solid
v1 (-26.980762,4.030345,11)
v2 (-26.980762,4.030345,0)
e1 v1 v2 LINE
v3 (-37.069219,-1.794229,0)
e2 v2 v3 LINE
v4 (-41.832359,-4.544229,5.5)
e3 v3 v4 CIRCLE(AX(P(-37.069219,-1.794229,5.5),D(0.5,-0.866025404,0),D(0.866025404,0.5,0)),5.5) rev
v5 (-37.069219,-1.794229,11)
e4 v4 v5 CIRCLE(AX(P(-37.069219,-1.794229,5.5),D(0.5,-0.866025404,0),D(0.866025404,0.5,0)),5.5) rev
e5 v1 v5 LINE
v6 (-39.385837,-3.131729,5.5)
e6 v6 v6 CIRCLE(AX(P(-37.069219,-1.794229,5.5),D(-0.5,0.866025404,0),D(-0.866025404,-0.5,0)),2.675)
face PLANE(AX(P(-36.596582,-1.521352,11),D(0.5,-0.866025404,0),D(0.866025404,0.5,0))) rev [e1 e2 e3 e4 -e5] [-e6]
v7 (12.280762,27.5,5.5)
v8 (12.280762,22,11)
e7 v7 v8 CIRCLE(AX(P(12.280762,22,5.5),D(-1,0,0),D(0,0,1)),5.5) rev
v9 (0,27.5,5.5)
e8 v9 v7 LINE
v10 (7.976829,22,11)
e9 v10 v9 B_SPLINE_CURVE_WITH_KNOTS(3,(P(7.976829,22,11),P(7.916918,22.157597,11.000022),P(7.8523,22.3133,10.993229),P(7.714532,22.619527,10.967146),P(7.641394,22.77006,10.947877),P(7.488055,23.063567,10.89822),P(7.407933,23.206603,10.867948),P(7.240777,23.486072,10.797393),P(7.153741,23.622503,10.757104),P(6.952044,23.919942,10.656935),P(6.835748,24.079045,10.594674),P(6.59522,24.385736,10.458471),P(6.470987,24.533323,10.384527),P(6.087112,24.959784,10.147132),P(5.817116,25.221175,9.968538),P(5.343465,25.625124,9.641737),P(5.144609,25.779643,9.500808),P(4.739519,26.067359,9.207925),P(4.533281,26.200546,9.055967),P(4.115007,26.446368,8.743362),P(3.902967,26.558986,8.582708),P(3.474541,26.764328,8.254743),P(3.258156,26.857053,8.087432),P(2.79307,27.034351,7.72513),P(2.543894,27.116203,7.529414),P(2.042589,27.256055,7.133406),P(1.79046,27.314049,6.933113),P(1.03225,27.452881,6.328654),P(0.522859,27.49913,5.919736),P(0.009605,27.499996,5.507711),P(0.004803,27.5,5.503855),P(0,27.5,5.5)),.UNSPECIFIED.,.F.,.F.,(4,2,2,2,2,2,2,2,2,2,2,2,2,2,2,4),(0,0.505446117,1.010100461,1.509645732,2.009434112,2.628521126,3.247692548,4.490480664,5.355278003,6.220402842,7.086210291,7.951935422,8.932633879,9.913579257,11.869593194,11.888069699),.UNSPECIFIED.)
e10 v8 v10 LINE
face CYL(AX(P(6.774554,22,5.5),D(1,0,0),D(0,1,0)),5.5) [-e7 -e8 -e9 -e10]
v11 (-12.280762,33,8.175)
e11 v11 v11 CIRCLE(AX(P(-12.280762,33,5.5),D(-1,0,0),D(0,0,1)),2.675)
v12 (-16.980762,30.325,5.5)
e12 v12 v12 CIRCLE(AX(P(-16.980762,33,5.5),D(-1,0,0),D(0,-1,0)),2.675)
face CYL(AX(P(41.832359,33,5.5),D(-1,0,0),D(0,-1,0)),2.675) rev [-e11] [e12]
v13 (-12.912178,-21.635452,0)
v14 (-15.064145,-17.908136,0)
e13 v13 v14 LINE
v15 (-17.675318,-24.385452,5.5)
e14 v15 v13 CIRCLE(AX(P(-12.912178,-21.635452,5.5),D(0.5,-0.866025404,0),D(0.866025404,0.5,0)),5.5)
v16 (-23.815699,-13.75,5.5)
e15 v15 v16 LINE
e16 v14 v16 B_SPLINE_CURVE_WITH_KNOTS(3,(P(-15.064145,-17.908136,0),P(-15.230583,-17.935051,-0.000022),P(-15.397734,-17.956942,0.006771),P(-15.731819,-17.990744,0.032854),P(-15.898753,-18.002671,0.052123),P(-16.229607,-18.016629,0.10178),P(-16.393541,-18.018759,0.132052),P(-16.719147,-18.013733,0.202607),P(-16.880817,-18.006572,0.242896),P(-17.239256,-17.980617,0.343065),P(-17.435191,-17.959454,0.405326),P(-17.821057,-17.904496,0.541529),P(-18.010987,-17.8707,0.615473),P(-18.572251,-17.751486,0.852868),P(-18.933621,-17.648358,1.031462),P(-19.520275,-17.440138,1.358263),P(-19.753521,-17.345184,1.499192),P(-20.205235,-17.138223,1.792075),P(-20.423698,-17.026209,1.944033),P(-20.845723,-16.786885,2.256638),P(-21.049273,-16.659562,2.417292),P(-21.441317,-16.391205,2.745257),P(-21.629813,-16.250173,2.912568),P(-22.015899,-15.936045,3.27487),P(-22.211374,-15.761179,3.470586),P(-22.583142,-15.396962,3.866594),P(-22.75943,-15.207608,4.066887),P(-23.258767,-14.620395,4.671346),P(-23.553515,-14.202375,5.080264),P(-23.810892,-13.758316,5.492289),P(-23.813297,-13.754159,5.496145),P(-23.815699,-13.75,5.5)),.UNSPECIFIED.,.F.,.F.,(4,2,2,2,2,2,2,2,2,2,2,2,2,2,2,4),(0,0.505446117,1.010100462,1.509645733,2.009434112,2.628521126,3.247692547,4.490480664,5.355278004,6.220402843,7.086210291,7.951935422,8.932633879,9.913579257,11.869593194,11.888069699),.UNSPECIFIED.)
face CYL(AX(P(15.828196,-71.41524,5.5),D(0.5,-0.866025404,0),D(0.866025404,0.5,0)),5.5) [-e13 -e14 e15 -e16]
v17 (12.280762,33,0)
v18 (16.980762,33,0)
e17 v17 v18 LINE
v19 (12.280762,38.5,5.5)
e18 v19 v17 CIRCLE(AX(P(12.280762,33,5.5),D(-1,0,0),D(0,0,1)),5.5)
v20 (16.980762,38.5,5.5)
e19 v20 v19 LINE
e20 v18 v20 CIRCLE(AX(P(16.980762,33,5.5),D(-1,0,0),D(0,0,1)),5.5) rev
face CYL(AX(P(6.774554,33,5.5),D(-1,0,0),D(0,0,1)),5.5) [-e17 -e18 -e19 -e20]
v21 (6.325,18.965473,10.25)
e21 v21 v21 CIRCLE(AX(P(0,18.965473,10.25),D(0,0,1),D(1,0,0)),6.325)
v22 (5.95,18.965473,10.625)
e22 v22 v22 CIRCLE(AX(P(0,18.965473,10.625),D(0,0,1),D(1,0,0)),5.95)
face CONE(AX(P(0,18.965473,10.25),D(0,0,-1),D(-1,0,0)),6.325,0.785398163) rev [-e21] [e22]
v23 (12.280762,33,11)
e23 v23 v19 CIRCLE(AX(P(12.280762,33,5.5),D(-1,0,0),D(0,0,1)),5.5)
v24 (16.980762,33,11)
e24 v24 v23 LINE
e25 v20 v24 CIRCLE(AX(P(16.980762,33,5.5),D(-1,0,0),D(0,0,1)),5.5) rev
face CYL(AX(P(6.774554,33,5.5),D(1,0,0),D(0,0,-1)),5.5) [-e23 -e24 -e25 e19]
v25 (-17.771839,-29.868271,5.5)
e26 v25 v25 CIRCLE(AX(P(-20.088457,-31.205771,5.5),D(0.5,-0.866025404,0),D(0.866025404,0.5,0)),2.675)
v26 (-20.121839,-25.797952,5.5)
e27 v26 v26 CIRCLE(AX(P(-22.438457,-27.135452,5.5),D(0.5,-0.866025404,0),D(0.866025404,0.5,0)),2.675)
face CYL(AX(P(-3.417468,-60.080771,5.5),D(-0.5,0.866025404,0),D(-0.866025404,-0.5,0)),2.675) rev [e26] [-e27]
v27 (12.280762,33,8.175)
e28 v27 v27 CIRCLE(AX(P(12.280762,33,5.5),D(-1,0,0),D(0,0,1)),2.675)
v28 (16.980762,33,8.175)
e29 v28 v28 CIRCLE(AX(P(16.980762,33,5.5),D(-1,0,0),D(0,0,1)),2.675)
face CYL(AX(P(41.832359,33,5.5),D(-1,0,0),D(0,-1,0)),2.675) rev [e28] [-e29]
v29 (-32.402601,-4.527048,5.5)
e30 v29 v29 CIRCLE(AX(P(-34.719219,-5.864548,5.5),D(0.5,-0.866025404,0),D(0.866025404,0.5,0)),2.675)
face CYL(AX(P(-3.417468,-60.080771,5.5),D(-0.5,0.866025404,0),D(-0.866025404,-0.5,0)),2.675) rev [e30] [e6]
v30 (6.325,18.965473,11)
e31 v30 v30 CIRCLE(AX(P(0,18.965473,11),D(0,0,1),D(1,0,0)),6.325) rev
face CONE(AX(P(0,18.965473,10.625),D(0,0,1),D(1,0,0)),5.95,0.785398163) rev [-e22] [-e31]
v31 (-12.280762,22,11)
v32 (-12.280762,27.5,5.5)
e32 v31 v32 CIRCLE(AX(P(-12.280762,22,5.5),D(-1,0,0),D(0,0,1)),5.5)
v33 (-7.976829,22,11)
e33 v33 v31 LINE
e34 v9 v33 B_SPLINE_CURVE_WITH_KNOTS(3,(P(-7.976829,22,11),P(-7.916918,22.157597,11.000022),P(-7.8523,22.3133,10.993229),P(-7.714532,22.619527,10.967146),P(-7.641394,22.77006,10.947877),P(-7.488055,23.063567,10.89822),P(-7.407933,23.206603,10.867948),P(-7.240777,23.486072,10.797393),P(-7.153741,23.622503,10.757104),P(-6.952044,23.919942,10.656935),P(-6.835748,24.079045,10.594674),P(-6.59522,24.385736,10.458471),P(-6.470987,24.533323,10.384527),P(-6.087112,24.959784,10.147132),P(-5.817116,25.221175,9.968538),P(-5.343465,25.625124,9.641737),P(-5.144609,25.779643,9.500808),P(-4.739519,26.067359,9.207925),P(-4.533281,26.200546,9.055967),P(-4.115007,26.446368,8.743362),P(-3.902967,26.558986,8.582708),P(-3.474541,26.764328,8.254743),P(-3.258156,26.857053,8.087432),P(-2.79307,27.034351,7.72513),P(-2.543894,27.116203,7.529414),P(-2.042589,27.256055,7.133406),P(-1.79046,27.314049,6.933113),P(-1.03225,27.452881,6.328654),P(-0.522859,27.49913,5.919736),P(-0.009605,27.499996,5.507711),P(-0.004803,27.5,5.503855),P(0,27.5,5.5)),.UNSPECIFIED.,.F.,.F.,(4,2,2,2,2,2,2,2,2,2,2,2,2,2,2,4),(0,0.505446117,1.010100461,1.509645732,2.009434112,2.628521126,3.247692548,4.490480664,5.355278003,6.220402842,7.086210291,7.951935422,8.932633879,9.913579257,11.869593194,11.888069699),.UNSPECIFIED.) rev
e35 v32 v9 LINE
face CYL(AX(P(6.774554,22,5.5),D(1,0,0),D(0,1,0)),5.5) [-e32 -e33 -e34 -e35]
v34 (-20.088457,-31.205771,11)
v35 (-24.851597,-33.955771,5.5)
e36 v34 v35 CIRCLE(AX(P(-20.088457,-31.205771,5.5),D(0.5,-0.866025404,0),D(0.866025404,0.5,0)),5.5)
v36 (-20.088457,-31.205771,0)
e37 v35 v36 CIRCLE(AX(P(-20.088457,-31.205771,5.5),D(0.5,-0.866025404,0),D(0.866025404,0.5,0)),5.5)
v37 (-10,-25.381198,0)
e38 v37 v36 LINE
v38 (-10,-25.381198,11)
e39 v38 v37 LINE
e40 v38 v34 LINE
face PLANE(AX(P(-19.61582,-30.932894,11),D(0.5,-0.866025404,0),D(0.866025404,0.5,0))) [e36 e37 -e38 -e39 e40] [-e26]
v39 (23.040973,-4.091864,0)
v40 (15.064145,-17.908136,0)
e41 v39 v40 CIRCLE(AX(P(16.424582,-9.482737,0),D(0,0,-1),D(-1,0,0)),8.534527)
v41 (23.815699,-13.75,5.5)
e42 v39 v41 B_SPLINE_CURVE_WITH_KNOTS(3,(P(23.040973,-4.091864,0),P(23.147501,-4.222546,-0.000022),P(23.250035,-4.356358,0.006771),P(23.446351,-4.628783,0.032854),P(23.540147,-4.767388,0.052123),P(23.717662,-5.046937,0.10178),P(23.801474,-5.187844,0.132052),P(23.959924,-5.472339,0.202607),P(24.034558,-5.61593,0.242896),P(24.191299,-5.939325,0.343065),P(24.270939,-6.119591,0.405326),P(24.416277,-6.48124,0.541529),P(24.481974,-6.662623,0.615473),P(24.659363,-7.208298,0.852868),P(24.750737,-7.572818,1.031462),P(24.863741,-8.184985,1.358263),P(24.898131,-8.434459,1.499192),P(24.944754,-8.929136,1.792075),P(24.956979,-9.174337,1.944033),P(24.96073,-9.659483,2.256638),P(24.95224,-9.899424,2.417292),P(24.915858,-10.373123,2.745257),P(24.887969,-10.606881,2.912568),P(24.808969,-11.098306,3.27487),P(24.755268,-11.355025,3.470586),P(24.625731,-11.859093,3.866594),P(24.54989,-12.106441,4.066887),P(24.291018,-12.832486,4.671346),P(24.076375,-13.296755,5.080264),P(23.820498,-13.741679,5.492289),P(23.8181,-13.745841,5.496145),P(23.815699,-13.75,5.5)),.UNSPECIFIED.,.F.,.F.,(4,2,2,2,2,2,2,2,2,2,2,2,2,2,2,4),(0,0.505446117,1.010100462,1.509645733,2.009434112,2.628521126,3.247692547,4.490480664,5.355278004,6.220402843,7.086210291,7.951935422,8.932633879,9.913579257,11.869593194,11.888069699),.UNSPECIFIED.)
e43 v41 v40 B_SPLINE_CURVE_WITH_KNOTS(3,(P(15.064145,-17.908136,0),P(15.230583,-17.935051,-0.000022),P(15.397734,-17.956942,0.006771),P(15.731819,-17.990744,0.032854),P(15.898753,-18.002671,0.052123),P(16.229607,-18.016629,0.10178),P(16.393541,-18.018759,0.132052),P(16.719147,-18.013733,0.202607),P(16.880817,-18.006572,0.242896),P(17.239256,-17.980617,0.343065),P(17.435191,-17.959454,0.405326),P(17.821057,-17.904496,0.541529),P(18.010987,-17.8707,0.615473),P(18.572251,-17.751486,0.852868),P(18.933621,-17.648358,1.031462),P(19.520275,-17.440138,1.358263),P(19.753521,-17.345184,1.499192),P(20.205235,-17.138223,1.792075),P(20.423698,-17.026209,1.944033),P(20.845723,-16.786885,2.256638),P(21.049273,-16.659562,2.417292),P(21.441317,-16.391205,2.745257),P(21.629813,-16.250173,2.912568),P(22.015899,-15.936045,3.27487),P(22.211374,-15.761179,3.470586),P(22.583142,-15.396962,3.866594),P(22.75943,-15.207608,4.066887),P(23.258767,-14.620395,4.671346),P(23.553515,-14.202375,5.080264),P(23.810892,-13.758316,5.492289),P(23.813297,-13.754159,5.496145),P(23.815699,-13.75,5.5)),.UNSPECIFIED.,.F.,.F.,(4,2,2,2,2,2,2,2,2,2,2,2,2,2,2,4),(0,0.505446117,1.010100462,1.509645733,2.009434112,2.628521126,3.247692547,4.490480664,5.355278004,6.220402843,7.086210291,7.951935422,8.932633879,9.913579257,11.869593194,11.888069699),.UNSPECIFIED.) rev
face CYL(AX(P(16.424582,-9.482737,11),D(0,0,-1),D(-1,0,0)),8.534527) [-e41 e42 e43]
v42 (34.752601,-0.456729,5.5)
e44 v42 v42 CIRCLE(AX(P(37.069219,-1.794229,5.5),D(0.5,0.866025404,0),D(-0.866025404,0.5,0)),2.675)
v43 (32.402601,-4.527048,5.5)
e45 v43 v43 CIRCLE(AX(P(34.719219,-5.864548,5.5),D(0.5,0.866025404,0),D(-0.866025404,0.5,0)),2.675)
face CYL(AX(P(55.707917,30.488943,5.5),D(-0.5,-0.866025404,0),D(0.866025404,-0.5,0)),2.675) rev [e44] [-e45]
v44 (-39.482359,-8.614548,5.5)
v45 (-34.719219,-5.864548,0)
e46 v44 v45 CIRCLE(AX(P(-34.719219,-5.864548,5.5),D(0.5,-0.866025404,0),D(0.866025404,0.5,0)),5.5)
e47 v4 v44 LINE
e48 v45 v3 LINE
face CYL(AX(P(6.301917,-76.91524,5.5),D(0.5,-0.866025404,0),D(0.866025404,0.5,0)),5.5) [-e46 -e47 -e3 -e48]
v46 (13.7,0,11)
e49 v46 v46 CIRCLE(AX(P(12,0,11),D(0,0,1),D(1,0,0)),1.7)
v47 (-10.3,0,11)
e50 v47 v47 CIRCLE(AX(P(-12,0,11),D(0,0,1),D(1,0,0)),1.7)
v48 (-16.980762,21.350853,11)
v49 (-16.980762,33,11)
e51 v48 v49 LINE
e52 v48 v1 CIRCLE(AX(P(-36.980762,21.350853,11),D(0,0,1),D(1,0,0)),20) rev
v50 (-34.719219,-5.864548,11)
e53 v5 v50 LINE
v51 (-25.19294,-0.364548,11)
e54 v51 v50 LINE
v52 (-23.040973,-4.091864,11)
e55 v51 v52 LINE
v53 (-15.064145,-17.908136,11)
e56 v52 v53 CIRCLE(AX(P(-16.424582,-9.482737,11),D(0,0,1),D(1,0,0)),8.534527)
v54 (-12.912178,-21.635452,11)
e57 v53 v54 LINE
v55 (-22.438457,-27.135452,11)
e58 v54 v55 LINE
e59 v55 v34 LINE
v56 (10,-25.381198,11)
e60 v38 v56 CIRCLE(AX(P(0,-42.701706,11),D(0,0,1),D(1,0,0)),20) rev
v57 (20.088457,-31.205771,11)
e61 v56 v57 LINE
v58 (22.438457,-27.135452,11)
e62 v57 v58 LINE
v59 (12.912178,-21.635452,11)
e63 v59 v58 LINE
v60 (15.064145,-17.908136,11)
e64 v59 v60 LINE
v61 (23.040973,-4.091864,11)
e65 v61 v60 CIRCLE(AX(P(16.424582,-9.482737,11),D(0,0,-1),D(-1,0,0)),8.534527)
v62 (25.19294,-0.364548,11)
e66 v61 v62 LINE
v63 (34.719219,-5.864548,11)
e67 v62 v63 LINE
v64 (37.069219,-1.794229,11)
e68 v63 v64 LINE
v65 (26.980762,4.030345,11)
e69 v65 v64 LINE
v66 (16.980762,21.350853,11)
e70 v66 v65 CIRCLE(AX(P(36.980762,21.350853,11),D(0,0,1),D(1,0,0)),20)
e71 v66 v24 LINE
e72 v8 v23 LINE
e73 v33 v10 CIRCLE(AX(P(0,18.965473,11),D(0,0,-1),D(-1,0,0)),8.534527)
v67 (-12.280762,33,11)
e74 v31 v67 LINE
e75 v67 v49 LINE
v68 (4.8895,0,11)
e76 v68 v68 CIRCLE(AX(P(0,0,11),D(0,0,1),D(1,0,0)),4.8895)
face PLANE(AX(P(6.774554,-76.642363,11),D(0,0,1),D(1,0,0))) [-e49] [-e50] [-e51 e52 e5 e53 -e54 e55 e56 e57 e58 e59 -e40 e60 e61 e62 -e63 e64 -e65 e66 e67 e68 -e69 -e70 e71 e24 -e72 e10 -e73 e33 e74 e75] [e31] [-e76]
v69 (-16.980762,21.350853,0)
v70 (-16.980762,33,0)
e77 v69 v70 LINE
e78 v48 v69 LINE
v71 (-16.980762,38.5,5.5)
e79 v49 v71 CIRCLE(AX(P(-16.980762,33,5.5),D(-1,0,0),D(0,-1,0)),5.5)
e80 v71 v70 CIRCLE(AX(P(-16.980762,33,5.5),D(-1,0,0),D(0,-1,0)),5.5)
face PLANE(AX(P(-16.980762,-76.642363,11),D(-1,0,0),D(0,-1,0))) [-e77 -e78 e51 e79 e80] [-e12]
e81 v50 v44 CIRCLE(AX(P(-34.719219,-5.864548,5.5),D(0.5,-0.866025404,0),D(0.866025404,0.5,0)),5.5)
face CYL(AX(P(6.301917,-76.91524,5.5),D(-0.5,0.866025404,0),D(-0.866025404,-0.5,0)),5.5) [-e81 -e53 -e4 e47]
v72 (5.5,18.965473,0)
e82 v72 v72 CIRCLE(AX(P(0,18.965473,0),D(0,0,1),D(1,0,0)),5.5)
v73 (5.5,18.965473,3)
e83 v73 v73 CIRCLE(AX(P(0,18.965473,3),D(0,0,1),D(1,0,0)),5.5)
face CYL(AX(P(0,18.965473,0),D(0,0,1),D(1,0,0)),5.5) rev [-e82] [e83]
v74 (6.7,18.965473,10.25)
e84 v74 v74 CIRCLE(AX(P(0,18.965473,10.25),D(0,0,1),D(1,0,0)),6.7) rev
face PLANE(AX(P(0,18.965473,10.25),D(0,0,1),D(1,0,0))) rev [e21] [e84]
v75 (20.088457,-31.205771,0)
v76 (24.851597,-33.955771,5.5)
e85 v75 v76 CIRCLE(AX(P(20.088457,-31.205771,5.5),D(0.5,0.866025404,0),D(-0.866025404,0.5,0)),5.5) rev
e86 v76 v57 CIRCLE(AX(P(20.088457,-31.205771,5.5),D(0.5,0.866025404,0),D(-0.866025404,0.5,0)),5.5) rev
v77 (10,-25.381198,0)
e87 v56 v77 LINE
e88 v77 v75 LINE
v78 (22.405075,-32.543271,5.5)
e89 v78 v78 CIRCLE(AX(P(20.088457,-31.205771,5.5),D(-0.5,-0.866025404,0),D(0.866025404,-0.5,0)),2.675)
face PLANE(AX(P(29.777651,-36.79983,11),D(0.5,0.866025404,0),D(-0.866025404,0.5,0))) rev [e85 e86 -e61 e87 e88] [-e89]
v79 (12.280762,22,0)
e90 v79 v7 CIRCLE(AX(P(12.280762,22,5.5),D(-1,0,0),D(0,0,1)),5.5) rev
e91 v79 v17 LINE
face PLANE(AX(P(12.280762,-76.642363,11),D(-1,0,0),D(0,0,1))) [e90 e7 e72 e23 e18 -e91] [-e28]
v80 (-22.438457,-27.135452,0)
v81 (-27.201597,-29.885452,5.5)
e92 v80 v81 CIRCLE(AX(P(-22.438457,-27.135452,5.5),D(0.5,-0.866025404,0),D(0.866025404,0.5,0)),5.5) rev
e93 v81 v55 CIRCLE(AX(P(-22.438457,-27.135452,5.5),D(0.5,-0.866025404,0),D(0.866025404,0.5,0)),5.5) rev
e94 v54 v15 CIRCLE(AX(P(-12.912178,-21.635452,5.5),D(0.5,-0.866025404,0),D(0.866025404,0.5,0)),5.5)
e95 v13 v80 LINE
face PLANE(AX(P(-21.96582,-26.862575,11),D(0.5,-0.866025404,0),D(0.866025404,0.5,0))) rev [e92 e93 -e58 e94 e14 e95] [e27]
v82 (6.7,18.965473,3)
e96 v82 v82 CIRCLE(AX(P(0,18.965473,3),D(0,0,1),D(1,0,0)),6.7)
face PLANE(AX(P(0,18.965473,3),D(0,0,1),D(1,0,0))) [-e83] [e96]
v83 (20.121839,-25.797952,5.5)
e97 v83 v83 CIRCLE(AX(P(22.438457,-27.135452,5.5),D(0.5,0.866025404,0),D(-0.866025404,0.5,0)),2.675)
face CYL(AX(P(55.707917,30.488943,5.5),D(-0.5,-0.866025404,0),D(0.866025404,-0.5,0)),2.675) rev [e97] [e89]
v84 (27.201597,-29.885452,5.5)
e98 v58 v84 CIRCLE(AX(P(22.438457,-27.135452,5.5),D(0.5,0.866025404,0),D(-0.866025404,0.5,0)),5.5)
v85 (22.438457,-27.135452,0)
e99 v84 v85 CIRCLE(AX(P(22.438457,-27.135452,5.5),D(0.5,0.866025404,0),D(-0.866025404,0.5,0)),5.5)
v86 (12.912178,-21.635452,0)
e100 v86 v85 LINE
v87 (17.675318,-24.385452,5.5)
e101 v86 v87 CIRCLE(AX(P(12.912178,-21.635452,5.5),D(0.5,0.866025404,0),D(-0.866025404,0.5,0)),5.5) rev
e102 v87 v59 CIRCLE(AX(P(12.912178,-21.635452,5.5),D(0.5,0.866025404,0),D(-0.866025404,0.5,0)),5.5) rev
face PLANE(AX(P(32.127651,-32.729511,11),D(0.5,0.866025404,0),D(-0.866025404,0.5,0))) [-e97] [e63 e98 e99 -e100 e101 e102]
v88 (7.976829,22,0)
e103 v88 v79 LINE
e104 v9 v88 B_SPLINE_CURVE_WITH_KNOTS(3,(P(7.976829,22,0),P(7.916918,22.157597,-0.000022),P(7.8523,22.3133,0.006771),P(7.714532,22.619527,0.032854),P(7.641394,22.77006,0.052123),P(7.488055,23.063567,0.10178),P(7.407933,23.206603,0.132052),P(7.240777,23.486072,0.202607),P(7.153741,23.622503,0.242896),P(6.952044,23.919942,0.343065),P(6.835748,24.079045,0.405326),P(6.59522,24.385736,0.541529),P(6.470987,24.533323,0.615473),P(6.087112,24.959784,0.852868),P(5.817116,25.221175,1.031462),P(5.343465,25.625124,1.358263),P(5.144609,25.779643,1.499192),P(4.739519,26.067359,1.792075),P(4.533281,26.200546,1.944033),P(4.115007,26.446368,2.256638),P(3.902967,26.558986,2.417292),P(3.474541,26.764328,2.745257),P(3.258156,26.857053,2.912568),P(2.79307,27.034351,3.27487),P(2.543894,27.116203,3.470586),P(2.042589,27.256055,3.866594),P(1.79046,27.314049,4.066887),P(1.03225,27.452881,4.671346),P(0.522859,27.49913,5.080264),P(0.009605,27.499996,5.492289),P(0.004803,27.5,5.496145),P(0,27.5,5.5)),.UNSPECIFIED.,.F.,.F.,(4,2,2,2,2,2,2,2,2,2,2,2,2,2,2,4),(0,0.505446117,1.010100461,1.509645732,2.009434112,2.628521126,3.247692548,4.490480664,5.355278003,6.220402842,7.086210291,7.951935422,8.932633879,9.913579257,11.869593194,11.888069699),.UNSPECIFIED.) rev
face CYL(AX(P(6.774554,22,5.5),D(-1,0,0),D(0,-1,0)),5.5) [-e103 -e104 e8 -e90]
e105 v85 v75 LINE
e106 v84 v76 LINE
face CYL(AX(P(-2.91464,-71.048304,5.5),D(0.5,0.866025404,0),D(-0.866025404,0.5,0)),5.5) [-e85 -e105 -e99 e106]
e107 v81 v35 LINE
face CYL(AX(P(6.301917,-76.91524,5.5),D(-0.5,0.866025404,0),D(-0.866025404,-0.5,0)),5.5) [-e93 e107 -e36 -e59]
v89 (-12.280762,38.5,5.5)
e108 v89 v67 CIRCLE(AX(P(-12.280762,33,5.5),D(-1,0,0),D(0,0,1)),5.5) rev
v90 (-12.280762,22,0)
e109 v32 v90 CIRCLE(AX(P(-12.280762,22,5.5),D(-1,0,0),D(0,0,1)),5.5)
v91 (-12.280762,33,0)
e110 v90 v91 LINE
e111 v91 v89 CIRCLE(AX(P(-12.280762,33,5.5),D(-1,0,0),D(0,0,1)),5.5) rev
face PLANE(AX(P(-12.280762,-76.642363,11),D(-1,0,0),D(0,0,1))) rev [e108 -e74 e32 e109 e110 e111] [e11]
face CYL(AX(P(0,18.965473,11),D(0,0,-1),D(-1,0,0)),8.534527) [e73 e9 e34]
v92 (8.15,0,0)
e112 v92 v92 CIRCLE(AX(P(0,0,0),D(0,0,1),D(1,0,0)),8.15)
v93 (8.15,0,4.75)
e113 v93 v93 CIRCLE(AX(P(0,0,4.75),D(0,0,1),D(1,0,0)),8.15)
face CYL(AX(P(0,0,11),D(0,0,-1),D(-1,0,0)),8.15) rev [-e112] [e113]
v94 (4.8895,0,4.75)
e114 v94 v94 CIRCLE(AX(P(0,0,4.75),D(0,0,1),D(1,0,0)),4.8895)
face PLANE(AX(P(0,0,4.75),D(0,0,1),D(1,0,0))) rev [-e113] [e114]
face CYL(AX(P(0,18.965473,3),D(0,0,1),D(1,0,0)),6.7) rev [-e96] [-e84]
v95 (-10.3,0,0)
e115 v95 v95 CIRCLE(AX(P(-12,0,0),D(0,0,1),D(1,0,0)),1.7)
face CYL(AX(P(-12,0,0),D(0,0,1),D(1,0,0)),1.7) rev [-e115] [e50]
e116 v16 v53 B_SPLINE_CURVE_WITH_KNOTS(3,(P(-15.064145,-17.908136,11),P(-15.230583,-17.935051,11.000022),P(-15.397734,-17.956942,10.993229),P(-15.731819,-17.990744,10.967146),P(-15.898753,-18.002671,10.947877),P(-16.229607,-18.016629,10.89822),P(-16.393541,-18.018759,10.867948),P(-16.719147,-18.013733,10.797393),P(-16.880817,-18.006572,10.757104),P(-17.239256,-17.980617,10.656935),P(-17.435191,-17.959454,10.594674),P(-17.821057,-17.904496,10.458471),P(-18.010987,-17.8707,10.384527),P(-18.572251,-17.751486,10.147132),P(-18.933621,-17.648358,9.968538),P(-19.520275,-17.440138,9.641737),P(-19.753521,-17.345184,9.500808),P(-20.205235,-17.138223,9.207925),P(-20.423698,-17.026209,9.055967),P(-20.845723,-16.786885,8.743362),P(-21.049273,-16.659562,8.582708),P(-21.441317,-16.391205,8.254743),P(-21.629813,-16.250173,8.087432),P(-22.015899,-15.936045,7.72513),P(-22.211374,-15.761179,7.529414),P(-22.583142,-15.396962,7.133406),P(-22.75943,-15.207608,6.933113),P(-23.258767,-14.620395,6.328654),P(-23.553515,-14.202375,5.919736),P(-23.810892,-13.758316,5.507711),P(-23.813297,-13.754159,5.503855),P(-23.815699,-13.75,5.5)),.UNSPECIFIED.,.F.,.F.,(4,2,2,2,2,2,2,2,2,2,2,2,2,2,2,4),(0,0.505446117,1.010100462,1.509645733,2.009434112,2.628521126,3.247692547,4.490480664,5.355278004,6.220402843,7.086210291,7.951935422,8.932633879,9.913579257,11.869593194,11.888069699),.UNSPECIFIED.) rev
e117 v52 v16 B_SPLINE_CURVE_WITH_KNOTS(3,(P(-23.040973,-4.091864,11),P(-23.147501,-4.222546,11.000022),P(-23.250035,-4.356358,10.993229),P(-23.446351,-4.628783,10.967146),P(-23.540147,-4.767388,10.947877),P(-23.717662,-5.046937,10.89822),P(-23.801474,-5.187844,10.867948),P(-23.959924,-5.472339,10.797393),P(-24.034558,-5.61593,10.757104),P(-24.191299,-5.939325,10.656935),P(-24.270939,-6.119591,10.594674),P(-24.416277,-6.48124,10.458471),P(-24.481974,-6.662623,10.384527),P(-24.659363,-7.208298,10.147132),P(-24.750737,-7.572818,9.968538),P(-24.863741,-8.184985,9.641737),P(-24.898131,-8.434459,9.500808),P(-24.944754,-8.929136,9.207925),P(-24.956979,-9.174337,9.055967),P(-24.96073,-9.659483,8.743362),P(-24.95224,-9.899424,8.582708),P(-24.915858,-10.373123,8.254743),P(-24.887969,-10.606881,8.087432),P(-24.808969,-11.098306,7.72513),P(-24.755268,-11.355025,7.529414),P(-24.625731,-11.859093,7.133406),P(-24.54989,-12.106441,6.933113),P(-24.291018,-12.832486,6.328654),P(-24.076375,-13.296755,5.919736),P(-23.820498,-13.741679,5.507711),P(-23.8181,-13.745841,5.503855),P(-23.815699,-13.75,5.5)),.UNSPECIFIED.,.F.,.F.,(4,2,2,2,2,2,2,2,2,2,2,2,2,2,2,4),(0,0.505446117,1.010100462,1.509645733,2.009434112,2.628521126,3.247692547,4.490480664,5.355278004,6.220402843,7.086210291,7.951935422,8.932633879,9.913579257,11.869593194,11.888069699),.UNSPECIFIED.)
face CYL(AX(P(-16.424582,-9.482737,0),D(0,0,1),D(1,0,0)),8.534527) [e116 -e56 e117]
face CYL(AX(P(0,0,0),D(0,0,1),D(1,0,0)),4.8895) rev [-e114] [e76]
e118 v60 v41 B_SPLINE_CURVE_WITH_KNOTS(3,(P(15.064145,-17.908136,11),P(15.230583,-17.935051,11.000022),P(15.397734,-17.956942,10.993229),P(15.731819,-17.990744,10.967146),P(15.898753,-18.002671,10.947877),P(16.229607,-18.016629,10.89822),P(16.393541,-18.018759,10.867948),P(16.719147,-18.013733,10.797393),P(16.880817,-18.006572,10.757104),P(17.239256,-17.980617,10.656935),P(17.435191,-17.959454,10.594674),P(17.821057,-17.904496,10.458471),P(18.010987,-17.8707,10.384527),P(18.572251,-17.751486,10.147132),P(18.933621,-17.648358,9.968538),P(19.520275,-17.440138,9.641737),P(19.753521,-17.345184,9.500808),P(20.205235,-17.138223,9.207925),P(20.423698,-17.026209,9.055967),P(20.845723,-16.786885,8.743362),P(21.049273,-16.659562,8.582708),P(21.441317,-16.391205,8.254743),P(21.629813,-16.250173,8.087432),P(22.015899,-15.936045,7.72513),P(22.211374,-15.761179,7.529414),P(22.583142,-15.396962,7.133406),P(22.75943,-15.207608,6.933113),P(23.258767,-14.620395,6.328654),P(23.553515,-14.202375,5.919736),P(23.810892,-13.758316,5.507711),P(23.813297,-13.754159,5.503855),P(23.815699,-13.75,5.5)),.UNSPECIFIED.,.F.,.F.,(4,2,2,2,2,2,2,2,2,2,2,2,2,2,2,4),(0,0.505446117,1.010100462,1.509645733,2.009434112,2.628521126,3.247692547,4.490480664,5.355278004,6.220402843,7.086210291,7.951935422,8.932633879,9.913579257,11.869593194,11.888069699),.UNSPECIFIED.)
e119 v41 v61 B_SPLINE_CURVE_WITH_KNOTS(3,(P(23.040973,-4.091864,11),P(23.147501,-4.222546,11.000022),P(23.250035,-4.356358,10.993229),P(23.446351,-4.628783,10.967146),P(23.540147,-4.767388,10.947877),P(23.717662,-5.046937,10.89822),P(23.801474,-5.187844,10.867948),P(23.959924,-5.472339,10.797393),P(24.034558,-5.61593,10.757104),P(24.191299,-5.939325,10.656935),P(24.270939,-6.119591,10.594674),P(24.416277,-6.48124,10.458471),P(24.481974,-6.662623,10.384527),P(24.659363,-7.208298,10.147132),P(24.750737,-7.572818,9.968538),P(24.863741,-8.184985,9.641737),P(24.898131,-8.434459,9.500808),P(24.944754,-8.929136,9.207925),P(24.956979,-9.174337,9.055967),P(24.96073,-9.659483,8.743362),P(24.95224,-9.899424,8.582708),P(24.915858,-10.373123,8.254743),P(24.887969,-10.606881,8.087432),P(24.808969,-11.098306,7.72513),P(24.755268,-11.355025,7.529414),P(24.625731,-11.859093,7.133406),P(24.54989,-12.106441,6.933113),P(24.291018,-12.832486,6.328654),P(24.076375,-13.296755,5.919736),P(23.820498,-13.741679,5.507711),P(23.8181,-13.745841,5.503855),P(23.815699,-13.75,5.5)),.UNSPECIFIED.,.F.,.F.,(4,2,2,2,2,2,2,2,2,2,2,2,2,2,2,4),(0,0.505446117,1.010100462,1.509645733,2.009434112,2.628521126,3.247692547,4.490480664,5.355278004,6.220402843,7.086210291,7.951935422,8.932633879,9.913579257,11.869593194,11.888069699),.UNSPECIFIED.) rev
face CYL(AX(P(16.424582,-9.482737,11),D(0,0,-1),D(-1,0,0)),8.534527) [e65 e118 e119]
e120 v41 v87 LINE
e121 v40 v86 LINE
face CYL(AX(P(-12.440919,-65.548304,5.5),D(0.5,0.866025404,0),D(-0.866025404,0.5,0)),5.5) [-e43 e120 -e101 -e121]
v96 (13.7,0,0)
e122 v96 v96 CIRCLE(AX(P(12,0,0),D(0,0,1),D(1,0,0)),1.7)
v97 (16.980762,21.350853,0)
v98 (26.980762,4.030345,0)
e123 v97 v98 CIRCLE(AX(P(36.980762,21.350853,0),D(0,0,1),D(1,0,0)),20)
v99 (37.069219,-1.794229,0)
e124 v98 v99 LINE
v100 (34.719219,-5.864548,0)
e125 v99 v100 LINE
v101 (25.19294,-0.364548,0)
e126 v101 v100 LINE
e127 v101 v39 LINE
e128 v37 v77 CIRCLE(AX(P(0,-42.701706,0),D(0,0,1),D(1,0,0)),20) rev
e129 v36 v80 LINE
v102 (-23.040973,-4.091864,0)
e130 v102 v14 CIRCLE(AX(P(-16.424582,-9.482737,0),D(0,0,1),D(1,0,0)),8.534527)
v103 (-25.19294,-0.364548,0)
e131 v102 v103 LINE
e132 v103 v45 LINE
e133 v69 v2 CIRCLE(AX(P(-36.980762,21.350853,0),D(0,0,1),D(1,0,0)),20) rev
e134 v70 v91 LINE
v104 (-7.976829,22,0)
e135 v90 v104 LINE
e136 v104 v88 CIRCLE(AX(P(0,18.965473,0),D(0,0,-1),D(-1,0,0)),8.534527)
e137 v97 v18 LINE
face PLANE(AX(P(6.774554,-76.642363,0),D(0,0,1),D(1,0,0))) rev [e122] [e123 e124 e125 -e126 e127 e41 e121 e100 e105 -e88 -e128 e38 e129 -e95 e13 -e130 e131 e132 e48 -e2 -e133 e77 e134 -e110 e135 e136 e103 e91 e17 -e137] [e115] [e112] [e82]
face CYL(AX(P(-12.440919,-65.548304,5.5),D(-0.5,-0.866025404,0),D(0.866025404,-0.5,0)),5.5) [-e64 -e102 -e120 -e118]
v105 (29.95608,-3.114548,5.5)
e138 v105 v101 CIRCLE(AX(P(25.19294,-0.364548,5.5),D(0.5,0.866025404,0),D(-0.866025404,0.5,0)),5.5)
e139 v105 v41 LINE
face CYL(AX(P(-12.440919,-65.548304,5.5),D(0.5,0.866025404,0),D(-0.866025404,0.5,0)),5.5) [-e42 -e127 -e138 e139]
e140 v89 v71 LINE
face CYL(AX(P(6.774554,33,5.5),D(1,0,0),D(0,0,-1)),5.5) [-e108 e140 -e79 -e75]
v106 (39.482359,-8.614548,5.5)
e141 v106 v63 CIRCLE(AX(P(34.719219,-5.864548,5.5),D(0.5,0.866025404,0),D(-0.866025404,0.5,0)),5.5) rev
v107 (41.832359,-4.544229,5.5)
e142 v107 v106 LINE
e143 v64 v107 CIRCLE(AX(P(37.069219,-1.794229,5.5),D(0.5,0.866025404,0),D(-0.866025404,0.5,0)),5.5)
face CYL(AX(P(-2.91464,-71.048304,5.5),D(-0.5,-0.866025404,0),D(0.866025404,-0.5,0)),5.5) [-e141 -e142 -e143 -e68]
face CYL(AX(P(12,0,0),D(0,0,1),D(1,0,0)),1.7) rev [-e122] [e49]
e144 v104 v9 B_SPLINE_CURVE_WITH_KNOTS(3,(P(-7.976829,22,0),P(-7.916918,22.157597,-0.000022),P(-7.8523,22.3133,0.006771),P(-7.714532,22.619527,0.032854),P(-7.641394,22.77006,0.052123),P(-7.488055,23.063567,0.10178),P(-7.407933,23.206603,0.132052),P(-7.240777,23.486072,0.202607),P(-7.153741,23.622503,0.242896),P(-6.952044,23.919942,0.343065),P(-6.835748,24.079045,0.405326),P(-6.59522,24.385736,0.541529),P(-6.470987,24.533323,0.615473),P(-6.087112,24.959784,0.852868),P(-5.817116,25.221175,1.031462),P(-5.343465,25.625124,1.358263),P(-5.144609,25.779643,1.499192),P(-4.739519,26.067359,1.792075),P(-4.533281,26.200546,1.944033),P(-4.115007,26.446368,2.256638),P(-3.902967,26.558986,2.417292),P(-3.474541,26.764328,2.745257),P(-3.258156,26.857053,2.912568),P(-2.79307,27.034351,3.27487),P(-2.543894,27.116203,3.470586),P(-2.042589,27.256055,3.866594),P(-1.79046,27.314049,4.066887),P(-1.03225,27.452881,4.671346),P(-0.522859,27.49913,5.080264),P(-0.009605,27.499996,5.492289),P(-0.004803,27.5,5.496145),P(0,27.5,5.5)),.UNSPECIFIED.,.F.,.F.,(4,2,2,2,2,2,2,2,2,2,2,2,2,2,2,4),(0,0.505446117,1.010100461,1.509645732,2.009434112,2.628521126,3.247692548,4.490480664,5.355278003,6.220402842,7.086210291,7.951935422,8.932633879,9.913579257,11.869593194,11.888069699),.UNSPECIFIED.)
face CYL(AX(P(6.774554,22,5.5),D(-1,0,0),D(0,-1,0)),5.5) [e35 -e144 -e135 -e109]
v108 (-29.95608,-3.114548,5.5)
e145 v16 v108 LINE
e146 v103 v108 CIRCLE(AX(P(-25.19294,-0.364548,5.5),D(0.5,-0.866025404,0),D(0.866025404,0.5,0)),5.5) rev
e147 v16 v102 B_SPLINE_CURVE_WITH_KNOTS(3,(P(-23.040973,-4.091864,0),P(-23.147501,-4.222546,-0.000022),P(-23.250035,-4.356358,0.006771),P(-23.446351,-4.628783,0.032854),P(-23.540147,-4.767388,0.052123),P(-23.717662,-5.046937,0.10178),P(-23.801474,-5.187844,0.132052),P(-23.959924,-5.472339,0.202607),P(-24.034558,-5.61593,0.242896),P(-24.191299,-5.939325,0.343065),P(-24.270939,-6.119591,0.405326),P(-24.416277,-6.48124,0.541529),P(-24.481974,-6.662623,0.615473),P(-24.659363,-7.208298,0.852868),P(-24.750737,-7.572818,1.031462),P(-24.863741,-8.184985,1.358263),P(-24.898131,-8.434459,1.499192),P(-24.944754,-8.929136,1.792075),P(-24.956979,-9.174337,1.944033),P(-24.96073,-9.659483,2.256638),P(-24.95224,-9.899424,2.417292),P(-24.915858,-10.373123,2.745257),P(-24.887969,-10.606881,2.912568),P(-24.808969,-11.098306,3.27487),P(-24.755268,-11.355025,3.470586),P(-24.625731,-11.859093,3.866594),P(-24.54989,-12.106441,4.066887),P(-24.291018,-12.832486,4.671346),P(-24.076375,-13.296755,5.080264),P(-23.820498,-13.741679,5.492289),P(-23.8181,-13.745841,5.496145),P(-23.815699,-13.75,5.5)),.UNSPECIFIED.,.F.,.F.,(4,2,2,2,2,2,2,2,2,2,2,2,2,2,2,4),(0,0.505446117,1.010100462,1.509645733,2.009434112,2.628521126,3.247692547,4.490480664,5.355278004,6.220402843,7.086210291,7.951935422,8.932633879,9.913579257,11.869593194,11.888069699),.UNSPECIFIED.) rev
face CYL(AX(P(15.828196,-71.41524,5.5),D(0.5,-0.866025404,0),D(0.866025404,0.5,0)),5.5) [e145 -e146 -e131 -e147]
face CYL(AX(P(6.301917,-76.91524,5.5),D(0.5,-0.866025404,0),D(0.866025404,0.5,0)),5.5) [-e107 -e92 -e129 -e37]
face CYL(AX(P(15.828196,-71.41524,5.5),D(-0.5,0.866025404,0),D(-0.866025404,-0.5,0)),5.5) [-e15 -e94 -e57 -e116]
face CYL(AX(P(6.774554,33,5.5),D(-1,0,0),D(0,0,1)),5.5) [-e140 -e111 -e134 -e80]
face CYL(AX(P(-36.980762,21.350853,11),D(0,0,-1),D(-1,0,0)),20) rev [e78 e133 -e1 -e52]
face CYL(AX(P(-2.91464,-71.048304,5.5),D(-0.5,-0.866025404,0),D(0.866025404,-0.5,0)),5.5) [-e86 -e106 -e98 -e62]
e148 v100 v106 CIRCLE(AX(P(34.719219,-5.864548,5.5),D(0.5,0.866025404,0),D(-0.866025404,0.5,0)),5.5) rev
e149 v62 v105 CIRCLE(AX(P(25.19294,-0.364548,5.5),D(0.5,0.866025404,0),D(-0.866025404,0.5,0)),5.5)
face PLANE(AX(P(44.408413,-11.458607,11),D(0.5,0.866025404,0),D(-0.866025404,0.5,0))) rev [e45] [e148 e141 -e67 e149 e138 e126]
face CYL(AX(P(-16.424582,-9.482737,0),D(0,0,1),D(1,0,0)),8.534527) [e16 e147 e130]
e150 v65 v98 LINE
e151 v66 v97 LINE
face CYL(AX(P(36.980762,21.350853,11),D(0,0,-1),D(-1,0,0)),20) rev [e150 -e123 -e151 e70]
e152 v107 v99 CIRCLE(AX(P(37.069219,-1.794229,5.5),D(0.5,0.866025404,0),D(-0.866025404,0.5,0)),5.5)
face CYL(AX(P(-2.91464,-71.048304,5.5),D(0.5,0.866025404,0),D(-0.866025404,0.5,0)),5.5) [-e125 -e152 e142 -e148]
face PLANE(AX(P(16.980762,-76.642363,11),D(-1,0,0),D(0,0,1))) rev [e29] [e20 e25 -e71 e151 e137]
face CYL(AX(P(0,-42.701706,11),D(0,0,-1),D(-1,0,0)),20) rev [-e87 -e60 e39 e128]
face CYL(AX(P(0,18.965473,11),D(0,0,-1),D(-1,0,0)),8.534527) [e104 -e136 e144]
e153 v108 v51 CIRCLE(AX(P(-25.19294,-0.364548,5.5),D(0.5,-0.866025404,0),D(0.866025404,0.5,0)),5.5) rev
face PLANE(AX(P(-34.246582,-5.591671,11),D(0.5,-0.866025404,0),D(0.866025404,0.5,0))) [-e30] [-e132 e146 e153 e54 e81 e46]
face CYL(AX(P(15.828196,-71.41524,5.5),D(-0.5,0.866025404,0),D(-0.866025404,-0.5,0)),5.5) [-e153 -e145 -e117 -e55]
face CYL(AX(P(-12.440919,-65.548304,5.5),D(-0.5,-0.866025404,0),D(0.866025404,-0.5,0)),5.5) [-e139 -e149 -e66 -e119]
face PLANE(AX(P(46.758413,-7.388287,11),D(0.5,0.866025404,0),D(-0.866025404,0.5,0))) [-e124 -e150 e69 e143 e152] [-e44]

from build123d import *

# Parameters (mm, degrees)
SKETCH1_R           = 8.15
BOSS_EXTRUDE1_DEPTH = 11
FILLET1_R           = 5.5
SKETCH5_R           = 8.534526782
BOSS_EXTRUDE2_DEPTH = 11
SKETCH6_R           = 8.534526782
BOSS_EXTRUDE3_DEPTH = 11
SKETCH7_R           = 8.534526782
BOSS_EXTRUDE4_DEPTH = 11
SKETCH8_R           = 1.7
CUT_EXTRUDE4_DEPTH  = 58.906789501
BOSS_EXTRUDE5_START = -6.25
SKETCH12_R          = 8.15
BOSS_EXTRUDE5_DEPTH = 6.25
SKETCH14_R          = 4.8895
CUT_EXTRUDE7_DEPTH  = 58.906789501
SKETCH15_R          = 6.7
CUT_EXTRUDE8_DEPTH  = 8
SKETCH16_R          = 5.5
CUT_EXTRUDE9_DEPTH  = 58.412509697
SKETCH18_R          = 6.7
SKETCH18_R_2        = 5.95
BOSS_EXTRUDE6_DEPTH = 0.75
CHAMFER1_SIZE       = 0.375
CHAMFER2_SIZE       = 0.375
FILLET2_R           = 5.5
SKETCH19_R          = 2.675
CUT_EXTRUDE10_DEPTH = 72.149372656
SKETCH20_R          = 2.675
CUT_EXTRUDE11_DEPTH = 71.861300583
SKETCH21_R          = 2.675
CUT_EXTRUDE12_DEPTH = 75.055602664


with BuildPart() as part:
    # Sketch1 → Boss-Extrude1 (new body)
    with BuildSketch(Plane.XY):
        with BuildLine():
            Line((-16.980762114, 38.5), (-12.280762114, 38.5))
            Line((-12.280762114, 38.5), (-12.280762114, 27.5))
            Line((-12.280762114, 27.5), (12.280762114, 27.5))
            Line((12.280762114, 27.5), (12.280762114, 38.5))
            Line((12.280762114, 38.5), (16.980762114, 38.5))
            Line((16.980762114, 38.5), (16.980762114, 21.350852961))
            ThreePointArc((16.980762114, 21.350852961), (19.660254038, 11.350852961), (26.980762114, 4.030344885))
            Line((26.980762114, 4.030344885), (41.832359102, -4.544228634))
            Line((41.832359102, -4.544228634), (39.482359102, -8.614548032))
            Line((39.482359102, -8.614548032), (29.956079661, -3.114548032))
            Line((29.956079661, -3.114548032), (17.675317547, -24.385451968))
            Line((17.675317547, -24.385451968), (27.201596989, -29.885451968))
            Line((27.201596989, -29.885451968), (24.851596989, -33.955771366))
            Line((24.851596989, -33.955771366), (10, -25.381197846))
            ThreePointArc((10, -25.381197846), (0, -22.701705922), (-10, -25.381197846))
            Line((-10, -25.381197846), (-24.851596989, -33.955771366))
            Line((-24.851596989, -33.955771366), (-27.201596989, -29.885451968))
            Line((-27.201596989, -29.885451968), (-17.675317547, -24.385451968))
            Line((-17.675317547, -24.385451968), (-29.956079661, -3.114548032))
            Line((-29.956079661, -3.114548032), (-39.482359102, -8.614548032))
            Line((-39.482359102, -8.614548032), (-41.832359102, -4.544228634))
            Line((-41.832359102, -4.544228634), (-26.980762114, 4.030344885))
            ThreePointArc((-26.980762114, 4.030344885), (-19.660254038, 11.350852961), (-16.980762114, 21.350852961))
            Line((-16.980762114, 21.350852961), (-16.980762114, 38.5))
        make_face()
        Circle(SKETCH1_R, mode=Mode.SUBTRACT)
    extrude(amount=BOSS_EXTRUDE1_DEPTH)

    # Fillet1
    fillet1_edges = [part.edges().sort_by_distance(p)[0] for p in [
        (-23.815698604, -13.75, 0),
        (23.815698604, -13.75, 0),
        (23.815698604, -13.75, 11),
        (-23.815698604, -13.75, 11),
        (0, 27.5, 0),
        (0, 27.5, 11),
    ]]
    fillet(fillet1_edges, radius=FILLET1_R - 0.0001)  # a hair under: the kernel refuses the full size

    # Sketch5 → Boss-Extrude2 (add)
    with BuildSketch(Plane(origin=(0, 0, 0), x_dir=(-1, 0, 0), z_dir=(0, 0, -1))):
        with Locations((0, 18.965473218)):
            Circle(SKETCH5_R)
    extrude(amount=-BOSS_EXTRUDE2_DEPTH)

    # Sketch6 → Boss-Extrude3 (add)
    with BuildSketch(Plane(origin=(0, 0, 0), x_dir=(-1, 0, 0), z_dir=(0, 0, -1))):
        with Locations((-16.424581602, -9.482736609)):
            Circle(SKETCH6_R)
    extrude(amount=-BOSS_EXTRUDE3_DEPTH)

    # Sketch7 → Boss-Extrude4 (add)
    with BuildSketch(Plane.XY.offset(11)):
        with Locations((-16.424581602, -9.482736609)):
            Circle(SKETCH7_R)
    extrude(amount=-BOSS_EXTRUDE4_DEPTH)

    # Sketch8 → Cut-Extrude4 (cut, through all)
    with BuildSketch(Plane.XY.offset(11)):
        with Locations((-12, 0)):
            Circle(SKETCH8_R)
        with Locations((12, 0)):
            Circle(SKETCH8_R)
    extrude(amount=-CUT_EXTRUDE4_DEPTH, mode=Mode.SUBTRACT)

    # Sketch12 → Boss-Extrude5 (add)
    with BuildSketch(Plane.XY.offset(11).offset(BOSS_EXTRUDE5_START)):
        Circle(SKETCH12_R)
    extrude(amount=BOSS_EXTRUDE5_DEPTH)

    # Sketch14 → Cut-Extrude7 (cut, through all)
    with BuildSketch(Plane.XY.offset(11)):
        Circle(SKETCH14_R)
    extrude(amount=-CUT_EXTRUDE7_DEPTH, mode=Mode.SUBTRACT)

    # Sketch15 → Cut-Extrude8 (cut)
    with BuildSketch(Plane.XY.offset(11)):
        with Locations((0, 18.965473218)):
            Circle(SKETCH15_R)
    extrude(amount=-CUT_EXTRUDE8_DEPTH, mode=Mode.SUBTRACT)

    # Sketch16 → Cut-Extrude9 (cut, through all)
    with BuildSketch(Plane.XY.offset(3)):
        with Locations((0, 18.965473218)):
            Circle(SKETCH16_R)
    extrude(amount=-CUT_EXTRUDE9_DEPTH, mode=Mode.SUBTRACT)

    # Sketch18 → Boss-Extrude6 (add)
    with BuildSketch(Plane.XY.offset(11)):
        with Locations((0, 18.965473218)):
            Circle(SKETCH18_R)
        with Locations((0, 18.965473218)):
            Circle(SKETCH18_R_2, mode=Mode.SUBTRACT)
    extrude(amount=-BOSS_EXTRUDE6_DEPTH)

    # Chamfer1
    chamfer1_edges = [part.edges().sort_by_distance(p)[0] for p in [
        (-5.95, 18.965473218, 11),
    ]]
    chamfer(chamfer1_edges, length=CHAMFER1_SIZE)

    # Chamfer2
    chamfer2_edges = [part.edges().sort_by_distance(p)[0] for p in [
        (-5.95, 18.965473218, 10.25),
    ]]
    chamfer(chamfer2_edges, length=CHAMFER2_SIZE - 0.0001)  # a hair under: the kernel refuses the full size

    # Fillet2
    fillet2_edges = [part.edges().sort_by_distance(p)[0] for p in [
        (26.026596989, -31.920611667, 0),
        (40.657359102, -6.579388333, 0),
        (26.026596989, -31.920611667, 11),
        (40.657359102, -6.579388333, 11),
        (14.630762114, 38.5, 0),
        (14.630762114, 38.5, 11),
        (-40.657359102, -6.579388333, 0),
        (-40.657359102, -6.579388333, 11),
        (-26.026596989, -31.920611667, 0),
        (-26.026596989, -31.920611667, 11),
        (-14.630762114, 38.5, 0),
        (-14.630762114, 38.5, 11),
    ]]
    fillet(fillet2_edges, radius=FILLET2_R - 0.0001)  # a hair under: the kernel refuses the full size

    # Sketch19 → Cut-Extrude10 (cut, through all)
    with BuildSketch(Plane.ZY.offset(16.980762114)):
        with Locations(Location((5.5, 33, 0), (0, 0, 270))):
            Circle(SKETCH19_R)
    extrude(amount=-CUT_EXTRUDE10_DEPTH, mode=Mode.SUBTRACT)

    # Sketch20 → Cut-Extrude11 (cut, through all)
    with BuildSketch(Plane(origin=(-8.490381057, 14.705771366, 0), x_dir=(0.8660254037844307, 0.5000000000000139, 0), z_dir=(-0.5000000000000139, 0.8660254037844307, 0))):
        with Locations((-33, -5.5)):
            Circle(SKETCH20_R)
    extrude(amount=-CUT_EXTRUDE11_DEPTH, mode=Mode.SUBTRACT)

    # Sketch21 → Cut-Extrude12 (cut, through all)
    with BuildSketch(Plane(origin=(-8.490381057, -14.705771366, 0), x_dir=(0.8660254037844329, -0.50000000000001, 0), z_dir=(-0.5000000000000099, -0.8660254037844328, 0))):
        with Locations(Location((33, 5.5, 0), (0, 0, 180))):
            Circle(SKETCH21_R)
    extrude(amount=-CUT_EXTRUDE12_DEPTH, mode=Mode.SUBTRACT)


solid = part.part
